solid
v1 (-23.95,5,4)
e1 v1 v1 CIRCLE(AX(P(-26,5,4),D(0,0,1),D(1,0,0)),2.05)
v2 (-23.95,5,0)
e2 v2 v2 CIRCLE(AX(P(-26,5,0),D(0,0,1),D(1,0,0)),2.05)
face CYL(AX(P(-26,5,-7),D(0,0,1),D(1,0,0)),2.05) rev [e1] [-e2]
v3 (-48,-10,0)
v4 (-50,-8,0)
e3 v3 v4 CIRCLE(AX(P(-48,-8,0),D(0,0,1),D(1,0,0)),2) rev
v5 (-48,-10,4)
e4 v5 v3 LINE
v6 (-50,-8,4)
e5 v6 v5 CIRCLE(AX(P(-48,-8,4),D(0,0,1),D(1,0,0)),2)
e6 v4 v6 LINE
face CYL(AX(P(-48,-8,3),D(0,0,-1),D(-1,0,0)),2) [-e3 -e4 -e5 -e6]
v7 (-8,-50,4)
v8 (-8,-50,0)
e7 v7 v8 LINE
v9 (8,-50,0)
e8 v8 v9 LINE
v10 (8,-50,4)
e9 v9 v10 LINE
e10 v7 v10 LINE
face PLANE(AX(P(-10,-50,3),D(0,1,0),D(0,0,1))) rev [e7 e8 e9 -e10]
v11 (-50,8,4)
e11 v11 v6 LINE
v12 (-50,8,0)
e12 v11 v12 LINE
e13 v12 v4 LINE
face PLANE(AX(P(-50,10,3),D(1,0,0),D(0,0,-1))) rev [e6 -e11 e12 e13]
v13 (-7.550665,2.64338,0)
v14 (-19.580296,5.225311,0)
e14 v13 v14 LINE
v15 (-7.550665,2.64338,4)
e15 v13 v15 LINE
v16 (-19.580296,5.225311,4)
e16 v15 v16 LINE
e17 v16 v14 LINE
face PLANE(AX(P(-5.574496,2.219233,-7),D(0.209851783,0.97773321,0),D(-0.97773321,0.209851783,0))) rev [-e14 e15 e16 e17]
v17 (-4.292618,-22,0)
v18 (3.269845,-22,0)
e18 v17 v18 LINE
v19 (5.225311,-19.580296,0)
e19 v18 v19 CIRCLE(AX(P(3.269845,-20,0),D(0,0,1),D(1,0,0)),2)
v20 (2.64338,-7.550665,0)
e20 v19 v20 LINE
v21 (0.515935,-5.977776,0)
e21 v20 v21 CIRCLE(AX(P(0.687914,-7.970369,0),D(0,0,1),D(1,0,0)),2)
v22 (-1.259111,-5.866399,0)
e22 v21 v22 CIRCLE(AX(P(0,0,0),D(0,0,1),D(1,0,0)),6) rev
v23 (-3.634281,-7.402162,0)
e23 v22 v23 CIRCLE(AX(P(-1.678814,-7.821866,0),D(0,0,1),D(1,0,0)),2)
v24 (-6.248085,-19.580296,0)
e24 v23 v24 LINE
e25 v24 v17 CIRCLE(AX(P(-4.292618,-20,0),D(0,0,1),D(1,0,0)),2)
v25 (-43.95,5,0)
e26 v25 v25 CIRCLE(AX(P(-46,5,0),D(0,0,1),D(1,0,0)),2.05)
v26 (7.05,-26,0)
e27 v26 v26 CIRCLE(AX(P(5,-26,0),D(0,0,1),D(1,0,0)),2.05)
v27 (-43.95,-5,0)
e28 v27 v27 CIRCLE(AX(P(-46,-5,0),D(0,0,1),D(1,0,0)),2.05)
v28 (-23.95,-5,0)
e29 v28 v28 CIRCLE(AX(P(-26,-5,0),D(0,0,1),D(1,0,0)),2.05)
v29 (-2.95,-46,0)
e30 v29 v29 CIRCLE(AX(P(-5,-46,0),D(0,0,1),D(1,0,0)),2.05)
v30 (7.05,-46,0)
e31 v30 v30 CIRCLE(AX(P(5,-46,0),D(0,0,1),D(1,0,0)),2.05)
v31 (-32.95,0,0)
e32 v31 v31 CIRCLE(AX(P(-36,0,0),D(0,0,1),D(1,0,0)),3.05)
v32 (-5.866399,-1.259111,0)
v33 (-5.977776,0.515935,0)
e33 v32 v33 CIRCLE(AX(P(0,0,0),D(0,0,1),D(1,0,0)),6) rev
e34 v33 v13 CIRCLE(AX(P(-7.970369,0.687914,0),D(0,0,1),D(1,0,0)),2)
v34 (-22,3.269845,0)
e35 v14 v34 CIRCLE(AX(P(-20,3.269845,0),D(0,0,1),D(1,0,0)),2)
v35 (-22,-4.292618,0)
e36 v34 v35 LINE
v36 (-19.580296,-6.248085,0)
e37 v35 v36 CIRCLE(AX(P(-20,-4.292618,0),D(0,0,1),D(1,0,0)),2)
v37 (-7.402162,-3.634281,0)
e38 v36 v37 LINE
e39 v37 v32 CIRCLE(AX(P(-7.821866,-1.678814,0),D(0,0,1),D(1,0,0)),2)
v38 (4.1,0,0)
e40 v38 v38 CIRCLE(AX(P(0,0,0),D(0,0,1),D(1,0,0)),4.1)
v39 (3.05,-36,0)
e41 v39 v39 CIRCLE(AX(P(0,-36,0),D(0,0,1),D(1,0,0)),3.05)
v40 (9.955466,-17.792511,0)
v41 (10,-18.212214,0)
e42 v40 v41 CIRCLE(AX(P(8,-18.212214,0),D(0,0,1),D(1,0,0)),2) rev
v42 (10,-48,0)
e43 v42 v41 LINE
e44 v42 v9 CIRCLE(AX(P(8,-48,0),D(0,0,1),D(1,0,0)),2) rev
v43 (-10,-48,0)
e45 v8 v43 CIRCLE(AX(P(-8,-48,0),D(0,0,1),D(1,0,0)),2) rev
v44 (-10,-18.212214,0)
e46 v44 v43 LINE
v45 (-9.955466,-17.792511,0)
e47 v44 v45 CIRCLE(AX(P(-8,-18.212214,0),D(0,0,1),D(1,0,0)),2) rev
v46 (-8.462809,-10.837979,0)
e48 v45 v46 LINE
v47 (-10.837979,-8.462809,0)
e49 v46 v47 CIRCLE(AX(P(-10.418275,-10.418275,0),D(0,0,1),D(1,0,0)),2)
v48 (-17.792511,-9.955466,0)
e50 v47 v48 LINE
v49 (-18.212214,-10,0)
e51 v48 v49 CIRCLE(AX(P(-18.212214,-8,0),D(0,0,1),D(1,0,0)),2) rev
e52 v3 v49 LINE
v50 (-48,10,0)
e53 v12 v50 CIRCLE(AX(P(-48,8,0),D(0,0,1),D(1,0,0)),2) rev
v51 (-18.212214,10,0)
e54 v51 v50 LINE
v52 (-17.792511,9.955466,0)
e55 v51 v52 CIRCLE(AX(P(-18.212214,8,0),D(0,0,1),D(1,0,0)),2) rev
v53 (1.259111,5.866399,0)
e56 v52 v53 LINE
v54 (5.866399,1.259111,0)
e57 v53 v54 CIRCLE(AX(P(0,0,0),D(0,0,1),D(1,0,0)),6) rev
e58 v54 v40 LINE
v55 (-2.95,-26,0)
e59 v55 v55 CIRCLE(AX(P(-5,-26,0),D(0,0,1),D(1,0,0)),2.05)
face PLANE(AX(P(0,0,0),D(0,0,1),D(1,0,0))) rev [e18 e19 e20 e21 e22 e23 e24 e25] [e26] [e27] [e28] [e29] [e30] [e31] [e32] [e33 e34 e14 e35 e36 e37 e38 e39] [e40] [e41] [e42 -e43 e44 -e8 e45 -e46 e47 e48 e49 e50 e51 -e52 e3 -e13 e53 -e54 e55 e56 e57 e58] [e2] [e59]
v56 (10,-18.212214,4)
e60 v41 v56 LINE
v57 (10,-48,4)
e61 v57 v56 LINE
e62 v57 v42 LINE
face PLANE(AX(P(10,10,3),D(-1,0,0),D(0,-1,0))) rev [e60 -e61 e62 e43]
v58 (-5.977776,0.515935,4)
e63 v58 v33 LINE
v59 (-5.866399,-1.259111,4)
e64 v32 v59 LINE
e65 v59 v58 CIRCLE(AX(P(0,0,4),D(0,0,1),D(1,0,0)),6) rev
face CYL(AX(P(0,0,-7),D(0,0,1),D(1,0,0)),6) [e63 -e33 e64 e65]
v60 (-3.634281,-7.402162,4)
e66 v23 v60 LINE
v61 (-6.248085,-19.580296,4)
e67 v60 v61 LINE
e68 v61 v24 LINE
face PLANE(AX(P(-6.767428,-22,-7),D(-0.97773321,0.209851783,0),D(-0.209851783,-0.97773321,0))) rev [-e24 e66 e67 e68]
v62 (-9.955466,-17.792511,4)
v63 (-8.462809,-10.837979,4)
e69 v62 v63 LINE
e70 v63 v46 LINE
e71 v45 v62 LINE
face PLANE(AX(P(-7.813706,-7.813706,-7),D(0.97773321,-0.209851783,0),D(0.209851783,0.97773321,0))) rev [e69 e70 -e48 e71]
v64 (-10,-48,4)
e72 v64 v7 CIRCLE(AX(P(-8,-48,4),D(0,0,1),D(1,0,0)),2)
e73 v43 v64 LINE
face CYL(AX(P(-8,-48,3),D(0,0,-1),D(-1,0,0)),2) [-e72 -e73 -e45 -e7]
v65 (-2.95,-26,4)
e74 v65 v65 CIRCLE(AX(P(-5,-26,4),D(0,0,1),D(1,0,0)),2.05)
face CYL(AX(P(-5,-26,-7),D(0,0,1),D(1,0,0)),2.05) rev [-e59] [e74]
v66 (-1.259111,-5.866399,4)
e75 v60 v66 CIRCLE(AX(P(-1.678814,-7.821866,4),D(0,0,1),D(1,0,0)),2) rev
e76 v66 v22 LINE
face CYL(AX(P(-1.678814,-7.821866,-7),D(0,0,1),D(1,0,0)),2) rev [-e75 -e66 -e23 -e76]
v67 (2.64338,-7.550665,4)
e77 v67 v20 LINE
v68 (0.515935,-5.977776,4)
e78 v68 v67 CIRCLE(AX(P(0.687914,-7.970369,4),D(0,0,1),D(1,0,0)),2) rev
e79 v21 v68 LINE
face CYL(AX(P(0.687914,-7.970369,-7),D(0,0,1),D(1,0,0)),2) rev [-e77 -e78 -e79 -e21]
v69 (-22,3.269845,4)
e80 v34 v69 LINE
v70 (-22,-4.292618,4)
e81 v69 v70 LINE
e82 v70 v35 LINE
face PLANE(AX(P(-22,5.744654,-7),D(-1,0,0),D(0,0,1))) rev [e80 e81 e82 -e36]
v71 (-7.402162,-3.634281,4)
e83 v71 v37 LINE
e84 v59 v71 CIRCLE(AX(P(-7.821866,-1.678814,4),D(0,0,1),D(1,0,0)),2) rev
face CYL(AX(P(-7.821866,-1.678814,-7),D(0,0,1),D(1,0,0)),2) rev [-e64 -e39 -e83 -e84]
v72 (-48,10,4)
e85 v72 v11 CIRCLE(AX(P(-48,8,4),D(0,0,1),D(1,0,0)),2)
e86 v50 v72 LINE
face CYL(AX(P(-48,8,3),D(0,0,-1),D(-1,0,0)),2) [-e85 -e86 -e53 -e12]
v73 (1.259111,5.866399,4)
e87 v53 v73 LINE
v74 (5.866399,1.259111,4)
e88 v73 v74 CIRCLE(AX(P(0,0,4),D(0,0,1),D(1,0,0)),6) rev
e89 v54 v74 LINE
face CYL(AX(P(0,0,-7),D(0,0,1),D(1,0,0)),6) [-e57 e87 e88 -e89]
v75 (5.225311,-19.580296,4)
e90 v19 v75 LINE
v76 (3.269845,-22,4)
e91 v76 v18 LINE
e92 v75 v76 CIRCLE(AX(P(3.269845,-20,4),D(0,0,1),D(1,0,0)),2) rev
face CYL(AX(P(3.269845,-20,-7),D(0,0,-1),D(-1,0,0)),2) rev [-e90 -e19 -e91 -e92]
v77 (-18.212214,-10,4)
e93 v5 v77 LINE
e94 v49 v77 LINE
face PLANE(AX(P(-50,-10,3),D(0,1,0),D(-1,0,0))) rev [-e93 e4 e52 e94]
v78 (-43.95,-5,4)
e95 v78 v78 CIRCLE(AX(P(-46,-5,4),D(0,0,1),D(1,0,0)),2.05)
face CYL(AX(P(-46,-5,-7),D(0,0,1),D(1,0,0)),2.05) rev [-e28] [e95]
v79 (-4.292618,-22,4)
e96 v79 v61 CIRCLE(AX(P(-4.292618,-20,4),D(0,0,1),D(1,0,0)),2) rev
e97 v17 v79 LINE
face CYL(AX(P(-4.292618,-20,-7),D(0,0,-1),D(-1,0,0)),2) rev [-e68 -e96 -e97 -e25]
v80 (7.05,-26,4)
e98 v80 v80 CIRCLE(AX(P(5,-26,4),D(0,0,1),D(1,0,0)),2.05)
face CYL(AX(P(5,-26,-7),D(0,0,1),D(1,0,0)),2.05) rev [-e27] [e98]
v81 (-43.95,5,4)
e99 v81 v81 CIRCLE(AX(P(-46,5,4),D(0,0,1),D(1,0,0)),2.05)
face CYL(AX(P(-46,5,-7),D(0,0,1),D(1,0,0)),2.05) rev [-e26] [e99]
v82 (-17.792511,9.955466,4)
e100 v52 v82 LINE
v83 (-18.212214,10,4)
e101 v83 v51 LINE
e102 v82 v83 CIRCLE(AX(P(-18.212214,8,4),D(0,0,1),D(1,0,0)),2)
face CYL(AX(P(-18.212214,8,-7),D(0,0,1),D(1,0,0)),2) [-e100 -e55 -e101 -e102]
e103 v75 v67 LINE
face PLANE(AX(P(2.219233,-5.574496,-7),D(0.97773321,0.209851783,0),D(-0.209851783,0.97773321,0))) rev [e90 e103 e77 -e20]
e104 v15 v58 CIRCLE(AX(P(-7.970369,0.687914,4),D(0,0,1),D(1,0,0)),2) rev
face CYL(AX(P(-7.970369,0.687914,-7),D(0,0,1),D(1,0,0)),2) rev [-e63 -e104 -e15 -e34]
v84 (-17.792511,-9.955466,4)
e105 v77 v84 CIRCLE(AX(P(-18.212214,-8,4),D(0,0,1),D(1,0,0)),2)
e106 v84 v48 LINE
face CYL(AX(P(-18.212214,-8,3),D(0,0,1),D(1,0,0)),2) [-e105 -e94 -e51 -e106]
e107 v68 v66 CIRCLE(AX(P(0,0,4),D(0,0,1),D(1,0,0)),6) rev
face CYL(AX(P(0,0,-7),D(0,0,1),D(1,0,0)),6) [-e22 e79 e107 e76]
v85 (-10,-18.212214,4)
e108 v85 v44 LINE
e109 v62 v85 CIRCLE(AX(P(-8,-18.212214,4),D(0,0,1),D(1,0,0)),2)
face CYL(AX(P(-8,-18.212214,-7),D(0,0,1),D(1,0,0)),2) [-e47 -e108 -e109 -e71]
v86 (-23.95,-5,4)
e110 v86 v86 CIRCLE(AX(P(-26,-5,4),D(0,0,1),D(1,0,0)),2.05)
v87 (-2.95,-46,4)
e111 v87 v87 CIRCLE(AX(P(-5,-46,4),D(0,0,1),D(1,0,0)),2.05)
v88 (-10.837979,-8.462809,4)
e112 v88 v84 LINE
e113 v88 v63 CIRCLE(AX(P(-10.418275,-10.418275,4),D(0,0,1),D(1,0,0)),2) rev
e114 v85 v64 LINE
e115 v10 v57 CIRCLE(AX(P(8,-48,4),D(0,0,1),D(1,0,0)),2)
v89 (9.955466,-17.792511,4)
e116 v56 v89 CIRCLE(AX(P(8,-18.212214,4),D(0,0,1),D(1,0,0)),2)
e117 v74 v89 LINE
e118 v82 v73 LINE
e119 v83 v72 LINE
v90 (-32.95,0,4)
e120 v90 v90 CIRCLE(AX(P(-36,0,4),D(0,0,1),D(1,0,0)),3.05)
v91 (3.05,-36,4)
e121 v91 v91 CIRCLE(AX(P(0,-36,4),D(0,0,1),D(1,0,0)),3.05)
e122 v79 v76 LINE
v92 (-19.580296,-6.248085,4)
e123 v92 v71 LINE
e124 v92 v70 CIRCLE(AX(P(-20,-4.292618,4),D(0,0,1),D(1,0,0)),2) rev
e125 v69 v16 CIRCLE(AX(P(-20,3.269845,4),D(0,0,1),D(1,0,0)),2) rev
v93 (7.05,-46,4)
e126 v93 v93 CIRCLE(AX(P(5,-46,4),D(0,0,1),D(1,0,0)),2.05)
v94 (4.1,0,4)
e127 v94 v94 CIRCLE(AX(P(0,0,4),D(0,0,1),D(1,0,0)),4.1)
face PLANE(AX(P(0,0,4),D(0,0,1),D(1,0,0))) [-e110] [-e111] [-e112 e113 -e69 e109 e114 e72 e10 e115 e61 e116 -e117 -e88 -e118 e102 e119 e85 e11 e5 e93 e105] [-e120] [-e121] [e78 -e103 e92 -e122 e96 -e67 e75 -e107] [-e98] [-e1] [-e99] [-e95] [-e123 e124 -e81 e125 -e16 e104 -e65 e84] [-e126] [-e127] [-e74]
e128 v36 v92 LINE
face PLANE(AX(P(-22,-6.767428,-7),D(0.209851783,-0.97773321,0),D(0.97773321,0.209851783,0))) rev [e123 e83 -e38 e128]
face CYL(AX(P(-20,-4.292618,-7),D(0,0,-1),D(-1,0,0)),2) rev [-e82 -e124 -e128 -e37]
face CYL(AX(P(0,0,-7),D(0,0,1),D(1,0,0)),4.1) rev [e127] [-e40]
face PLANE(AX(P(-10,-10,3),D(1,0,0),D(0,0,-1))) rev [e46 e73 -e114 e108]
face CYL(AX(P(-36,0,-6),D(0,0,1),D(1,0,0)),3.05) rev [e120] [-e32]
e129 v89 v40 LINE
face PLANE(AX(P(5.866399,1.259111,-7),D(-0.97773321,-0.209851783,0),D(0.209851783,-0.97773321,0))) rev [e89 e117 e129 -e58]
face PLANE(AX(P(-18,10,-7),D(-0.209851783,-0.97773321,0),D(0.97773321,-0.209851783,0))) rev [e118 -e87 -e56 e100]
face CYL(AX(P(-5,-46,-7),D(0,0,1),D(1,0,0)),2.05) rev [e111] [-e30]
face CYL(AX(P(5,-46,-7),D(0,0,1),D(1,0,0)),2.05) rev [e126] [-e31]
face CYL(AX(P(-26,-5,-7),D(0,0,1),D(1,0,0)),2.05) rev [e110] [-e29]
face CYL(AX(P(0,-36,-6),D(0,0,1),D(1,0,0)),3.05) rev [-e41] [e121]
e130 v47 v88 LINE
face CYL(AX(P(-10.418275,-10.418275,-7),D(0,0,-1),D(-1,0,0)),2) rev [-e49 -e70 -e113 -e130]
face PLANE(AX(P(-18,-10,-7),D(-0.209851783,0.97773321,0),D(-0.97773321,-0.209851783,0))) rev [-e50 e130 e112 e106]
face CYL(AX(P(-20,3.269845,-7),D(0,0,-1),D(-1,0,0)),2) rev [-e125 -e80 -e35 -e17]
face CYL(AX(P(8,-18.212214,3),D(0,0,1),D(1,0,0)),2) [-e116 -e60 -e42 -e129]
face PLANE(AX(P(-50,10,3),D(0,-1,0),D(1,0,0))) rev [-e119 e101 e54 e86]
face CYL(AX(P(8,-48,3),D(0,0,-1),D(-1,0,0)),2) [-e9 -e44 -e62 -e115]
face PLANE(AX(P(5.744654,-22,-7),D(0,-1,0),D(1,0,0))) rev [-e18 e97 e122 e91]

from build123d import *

# Parameters (mm, degrees)
EXTRUDE_1_DEPTH         = 3
SKETCH_2_R              = 2.05
CUT_EXTRUDE_1_DEPTH     = 10
CUT_EXTRUDE_2_DEPTH     = 10
SKETCH_4_R              = 4.1
CUT_EXTRUDE_3_DEPTH     = 10
SKETCH_5_W              = 14
SKETCH_5_H              = 10
SKETCH_5_W_2            = 10
SKETCH_5_H_2            = 14
CUT_EXTRUDE_4_DEPTH     = 10
FILLET_1_R              = 2
FILLET_2_R              = 2
MOVE_START              = 3
MOVE_FACE_1_OUTLINE_R   = 2.05
MOVE_FACE_1_OUTLINE_R_2 = 4.1
MOVE_FACE_1_DEPTH       = 1
SKETCH_9_W              = 14
SKETCH_9_H              = 10
SKETCH_9_W_2            = 10
SKETCH_9_H_2            = 14
EXTRUDE_2_DEPTH         = 4
SKETCH_10_R             = 3.05
CUT_EXTRUDE_6_DEPTH     = 10


# Read off the part's stored shape, not the designer's step: 移动面1
with BuildPart() as part:
    # 草图1 → 凸台-拉伸1 (new body)
    with BuildSketch(Plane.XY):
        Polygon((-50, 10), (10, 10), (10, -50), (-10, -50), (-10, -10), (-50, -10), align=None)
    extrude(amount=EXTRUDE_1_DEPTH)

    # 草图2 → 切除-拉伸1 (cut)
    with BuildSketch(Plane.XY.offset(3)):
        with Locations((-26, -5)):
            Circle(SKETCH_2_R)
        with Locations((-46, 5)):
            Circle(SKETCH_2_R)
        with Locations((-46, -5)):
            Circle(SKETCH_2_R)
        with Locations((-26, 5)):
            Circle(SKETCH_2_R)
        with Locations((5, -26)):
            Circle(SKETCH_2_R)
        with Locations((-5, -46)):
            Circle(SKETCH_2_R)
        with Locations((5, -46)):
            Circle(SKETCH_2_R)
        with Locations((-5, -26)):
            Circle(SKETCH_2_R)
    extrude(amount=-CUT_EXTRUDE_1_DEPTH, mode=Mode.SUBTRACT)

    # 草图3 → 切除-拉伸2 (cut)
    with BuildSketch(Plane.XY.offset(3)):
        with BuildLine():
            Line((-18, 10), (1.259110699, 5.866399258))
            ThreePointArc((1.259110699, 5.866399258), (4.242640687, 4.242640687), (5.866399258, 1.259110699))
            Line((5.866399258, 1.259110699), (10, -18))
            Line((10, -18), (10, 10))
            Line((10, 10), (-18, 10))
        make_face()
        Polygon((-18, -10), (-7.813706378, -7.813706378), (-10, -18), align=None)
    extrude(amount=-CUT_EXTRUDE_2_DEPTH, mode=Mode.SUBTRACT)

    # 草图4 → 切除-拉伸3 (cut)
    with BuildSketch(Plane.XY.offset(3)):
        Circle(SKETCH_4_R)
    extrude(amount=-CUT_EXTRUDE_3_DEPTH, mode=Mode.SUBTRACT)

    # 草图5 → 切除-拉伸4 (cut)
    with BuildSketch(Plane.XY.offset(3)):
        with Locations((-36, 0)):
            Rectangle(SKETCH_5_W, SKETCH_5_H)
        with BuildLine():
            Line((-22, 5.74465424), (-22, -6.767428132))
            Line((-22, -6.767428132), (-5.111190695, -3.14256737))
            ThreePointArc((-5.111190695, -3.14256737), (-5.977725364, -0.516526349), (-5.574495891, 2.219233101))
            Line((-5.574495891, 2.219233101), (-22, 5.74465424))
        make_face()
        with BuildLine():
            Line((2.219233101, -5.574495891), (5.74465424, -22))
            Line((5.74465424, -22), (-6.767428132, -22))
            Line((-6.767428132, -22), (-3.14256737, -5.111190695))
            ThreePointArc((-3.14256737, -5.111190695), (-0.516526349, -5.977725364), (2.219233101, -5.574495891))
        make_face()
        with Locations((0, -36)):
            Rectangle(SKETCH_5_W_2, SKETCH_5_H_2)
    extrude(amount=-CUT_EXTRUDE_4_DEPTH, mode=Mode.SUBTRACT)

    # 圆角1
    fillet_1_edges = [part.edges().sort_by_distance(p)[0] for p in [
        (-29, 5, 1.5),
        (-29, -5, 1.5),
        (-43, -5, 1.5),
        (-43, 5, 1.5),
        (-3.14256737, -5.111190695, 1.5),
        (2.219233101, -5.574495891, 1.5),
        (5.74465424, -22, 1.5),
        (-6.767428132, -22, 1.5),
        (5, -43, 1.5),
        (-5, -43, 1.5),
        (-5, -29, 1.5),
        (5, -29, 1.5),
        (-22, 5.74465424, 1.5),
        (-5.574495891, 2.219233101, 1.5),
        (-5.111190695, -3.14256737, 1.5),
        (-22, -6.767428132, 1.5),
    ]]
    fillet(fillet_1_edges, radius=FILLET_1_R)

    # 圆角2
    fillet_2_edges = [part.edges().sort_by_distance(p)[0] for p in [
        (-50, 10, 1.5),
        (10, -50, 1.5),
        (-10, -50, 1.5),
        (-50, -10, 1.5),
        (-18, -10, 1.5),
        (-7.813706378, -7.813706378, 1.5),
        (-10, -18, 1.5),
        (-18, 10, 1.5),
        (10, -18, 1.5),
    ]]
    fillet(fillet_2_edges, radius=FILLET_2_R)

    # Move Face 1 outline → Move Face 1 (add)
    with BuildSketch(Plane.XY.offset(MOVE_START)):
        with BuildLine():
            Line((-50, 8), (-50, -8))
            ThreePointArc((-50, -8), (-49.414213562, -9.414213562), (-48, -10))
            Line((-48, -10), (-18.21221445, -10))
            ThreePointArc((-18.21221445, -10), (-18.00118464, -9.988835443), (-17.792510884, -9.955466419))
            Line((-17.792510884, -9.955466419), (-10.837978737, -8.462808752))
            ThreePointArc((-10.837978737, -8.462808752), (-9.004061609, -9.004061609), (-8.462808752, -10.837978737))
            Line((-8.462808752, -10.837978737), (-9.955466419, -17.792510884))
            ThreePointArc((-9.955466419, -17.792510884), (-9.988835443, -18.00118464), (-10, -18.21221445))
            Line((-10, -18.21221445), (-10, -48))
            ThreePointArc((-10, -48), (-9.414213562, -49.414213562), (-8, -50))
            Line((-8, -50), (8, -50))
            ThreePointArc((8, -50), (9.414213562, -49.414213562), (10, -48))
            Line((10, -48), (10, -18.21221445))
            ThreePointArc((10, -18.21221445), (9.988835443, -18.00118464), (9.955466419, -17.792510884))
            Line((9.955466419, -17.792510884), (5.866399258, 1.259110699))
            ThreePointArc((5.866399258, 1.259110699), (4.242640687, 4.242640687), (1.259110699, 5.866399258))
            Line((1.259110699, 5.866399258), (-17.792510884, 9.955466419))
            ThreePointArc((-17.792510884, 9.955466419), (-18.00118464, 9.988835443), (-18.21221445, 10))
            Line((-18.21221445, 10), (-48, 10))
            ThreePointArc((-48, 10), (-49.414213562, 9.414213562), (-50, 8))
        make_face()
        with Locations((-5, -46)):
            Circle(MOVE_FACE_1_OUTLINE_R, mode=Mode.SUBTRACT)
        with Locations((5, -46)):
            Circle(MOVE_FACE_1_OUTLINE_R, mode=Mode.SUBTRACT)
        with BuildLine():
            Line((3, -43), (-3, -43))
            ThreePointArc((-3, -43), (-4.414213562, -42.414213562), (-5, -41))
            Line((-5, -41), (-5, -31))
            ThreePointArc((-5, -31), (-4.414213562, -29.585786438), (-3, -29))
            Line((-3, -29), (3, -29))
            ThreePointArc((3, -29), (4.414213562, -29.585786438), (5, -31))
            Line((5, -31), (5, -41))
            ThreePointArc((5, -41), (4.414213562, -42.414213562), (3, -43))
        make_face(mode=Mode.SUBTRACT)
        with Locations((-5, -26)):
            Circle(MOVE_FACE_1_OUTLINE_R, mode=Mode.SUBTRACT)
        with Locations((5, -26)):
            Circle(MOVE_FACE_1_OUTLINE_R, mode=Mode.SUBTRACT)
        with Locations((-46, -5)):
            Circle(MOVE_FACE_1_OUTLINE_R, mode=Mode.SUBTRACT)
        with BuildLine():
            Line((-29, 3), (-29, -3))
            ThreePointArc((-29, -3), (-29.585786438, -4.414213562), (-31, -5))
            Line((-31, -5), (-41, -5))
            ThreePointArc((-41, -5), (-42.414213562, -4.414213562), (-43, -3))
            Line((-43, -3), (-43, 3))
            ThreePointArc((-43, 3), (-42.414213562, 4.414213562), (-41, 5))
            Line((-41, 5), (-31, 5))
            ThreePointArc((-31, 5), (-29.585786438, 4.414213562), (-29, 3))
        make_face(mode=Mode.SUBTRACT)
        with Locations((-46, 5)):
            Circle(MOVE_FACE_1_OUTLINE_R, mode=Mode.SUBTRACT)
        with Locations((-26, -5)):
            Circle(MOVE_FACE_1_OUTLINE_R, mode=Mode.SUBTRACT)
        with Locations((-26, 5)):
            Circle(MOVE_FACE_1_OUTLINE_R, mode=Mode.SUBTRACT)
        with BuildLine():
            ThreePointArc((-3.634280684, -7.40216211), (-2.764762592, -6.142366874), (-1.259110699, -5.866399258))
            ThreePointArc((-1.259110699, -5.866399258), (-0.375737475, -5.988223555), (0.515935261, -5.97777641))
            ThreePointArc((0.515935261, -5.97777641), (1.87690568, -6.362171411), (2.6433801, -7.55066498))
            Line((2.6433801, -7.55066498), (5.225311026, -19.580296434))
            ThreePointArc((5.225311026, -19.580296434), (4.825384245, -21.257098418), (3.269844607, -22))
            Line((3.269844607, -22), (-4.292618499, -22))
            ThreePointArc((-4.292618499, -22), (-5.848158137, -21.257098418), (-6.248084918, -19.580296434))
            Line((-6.248084918, -19.580296434), (-3.634280684, -7.40216211))
        make_face(mode=Mode.SUBTRACT)
        with BuildLine():
            ThreePointArc((-7.55066498, 2.6433801), (-6.362171411, 1.87690568), (-5.97777641, 0.515935261))
            ThreePointArc((-5.97777641, 0.515935261), (-5.988223555, -0.375737475), (-5.866399258, -1.259110699))
            ThreePointArc((-5.866399258, -1.259110699), (-6.142366874, -2.764762592), (-7.40216211, -3.634280684))
            Line((-7.40216211, -3.634280684), (-19.580296434, -6.248084918))
            ThreePointArc((-19.580296434, -6.248084918), (-21.257098418, -5.848158137), (-22, -4.292618499))
            Line((-22, -4.292618499), (-22, 3.269844607))
            ThreePointArc((-22, 3.269844607), (-21.257098418, 4.825384245), (-19.580296434, 5.225311026))
            Line((-19.580296434, 5.225311026), (-7.55066498, 2.6433801))
        make_face(mode=Mode.SUBTRACT)
        Circle(MOVE_FACE_1_OUTLINE_R_2, mode=Mode.SUBTRACT)
    extrude(amount=MOVE_FACE_1_DEPTH)

    # 草图9 → 凸台-拉伸2 (add)
    with BuildSketch(Plane.XY.offset(4)):
        with Locations((-36, 0)):
            Rectangle(SKETCH_9_W, SKETCH_9_H)
        with Locations((0, -36)):
            Rectangle(SKETCH_9_W_2, SKETCH_9_H_2)
    extrude(amount=-EXTRUDE_2_DEPTH)

    # 草图10 → 切除-拉伸6 (cut)
    with BuildSketch(Plane.XY.offset(4)):
        with Locations((-36, 0)):
            Circle(SKETCH_10_R)
        with Locations((0, -36)):
            Circle(SKETCH_10_R)
    extrude(amount=-CUT_EXTRUDE_6_DEPTH, mode=Mode.SUBTRACT)


solid = part.part
